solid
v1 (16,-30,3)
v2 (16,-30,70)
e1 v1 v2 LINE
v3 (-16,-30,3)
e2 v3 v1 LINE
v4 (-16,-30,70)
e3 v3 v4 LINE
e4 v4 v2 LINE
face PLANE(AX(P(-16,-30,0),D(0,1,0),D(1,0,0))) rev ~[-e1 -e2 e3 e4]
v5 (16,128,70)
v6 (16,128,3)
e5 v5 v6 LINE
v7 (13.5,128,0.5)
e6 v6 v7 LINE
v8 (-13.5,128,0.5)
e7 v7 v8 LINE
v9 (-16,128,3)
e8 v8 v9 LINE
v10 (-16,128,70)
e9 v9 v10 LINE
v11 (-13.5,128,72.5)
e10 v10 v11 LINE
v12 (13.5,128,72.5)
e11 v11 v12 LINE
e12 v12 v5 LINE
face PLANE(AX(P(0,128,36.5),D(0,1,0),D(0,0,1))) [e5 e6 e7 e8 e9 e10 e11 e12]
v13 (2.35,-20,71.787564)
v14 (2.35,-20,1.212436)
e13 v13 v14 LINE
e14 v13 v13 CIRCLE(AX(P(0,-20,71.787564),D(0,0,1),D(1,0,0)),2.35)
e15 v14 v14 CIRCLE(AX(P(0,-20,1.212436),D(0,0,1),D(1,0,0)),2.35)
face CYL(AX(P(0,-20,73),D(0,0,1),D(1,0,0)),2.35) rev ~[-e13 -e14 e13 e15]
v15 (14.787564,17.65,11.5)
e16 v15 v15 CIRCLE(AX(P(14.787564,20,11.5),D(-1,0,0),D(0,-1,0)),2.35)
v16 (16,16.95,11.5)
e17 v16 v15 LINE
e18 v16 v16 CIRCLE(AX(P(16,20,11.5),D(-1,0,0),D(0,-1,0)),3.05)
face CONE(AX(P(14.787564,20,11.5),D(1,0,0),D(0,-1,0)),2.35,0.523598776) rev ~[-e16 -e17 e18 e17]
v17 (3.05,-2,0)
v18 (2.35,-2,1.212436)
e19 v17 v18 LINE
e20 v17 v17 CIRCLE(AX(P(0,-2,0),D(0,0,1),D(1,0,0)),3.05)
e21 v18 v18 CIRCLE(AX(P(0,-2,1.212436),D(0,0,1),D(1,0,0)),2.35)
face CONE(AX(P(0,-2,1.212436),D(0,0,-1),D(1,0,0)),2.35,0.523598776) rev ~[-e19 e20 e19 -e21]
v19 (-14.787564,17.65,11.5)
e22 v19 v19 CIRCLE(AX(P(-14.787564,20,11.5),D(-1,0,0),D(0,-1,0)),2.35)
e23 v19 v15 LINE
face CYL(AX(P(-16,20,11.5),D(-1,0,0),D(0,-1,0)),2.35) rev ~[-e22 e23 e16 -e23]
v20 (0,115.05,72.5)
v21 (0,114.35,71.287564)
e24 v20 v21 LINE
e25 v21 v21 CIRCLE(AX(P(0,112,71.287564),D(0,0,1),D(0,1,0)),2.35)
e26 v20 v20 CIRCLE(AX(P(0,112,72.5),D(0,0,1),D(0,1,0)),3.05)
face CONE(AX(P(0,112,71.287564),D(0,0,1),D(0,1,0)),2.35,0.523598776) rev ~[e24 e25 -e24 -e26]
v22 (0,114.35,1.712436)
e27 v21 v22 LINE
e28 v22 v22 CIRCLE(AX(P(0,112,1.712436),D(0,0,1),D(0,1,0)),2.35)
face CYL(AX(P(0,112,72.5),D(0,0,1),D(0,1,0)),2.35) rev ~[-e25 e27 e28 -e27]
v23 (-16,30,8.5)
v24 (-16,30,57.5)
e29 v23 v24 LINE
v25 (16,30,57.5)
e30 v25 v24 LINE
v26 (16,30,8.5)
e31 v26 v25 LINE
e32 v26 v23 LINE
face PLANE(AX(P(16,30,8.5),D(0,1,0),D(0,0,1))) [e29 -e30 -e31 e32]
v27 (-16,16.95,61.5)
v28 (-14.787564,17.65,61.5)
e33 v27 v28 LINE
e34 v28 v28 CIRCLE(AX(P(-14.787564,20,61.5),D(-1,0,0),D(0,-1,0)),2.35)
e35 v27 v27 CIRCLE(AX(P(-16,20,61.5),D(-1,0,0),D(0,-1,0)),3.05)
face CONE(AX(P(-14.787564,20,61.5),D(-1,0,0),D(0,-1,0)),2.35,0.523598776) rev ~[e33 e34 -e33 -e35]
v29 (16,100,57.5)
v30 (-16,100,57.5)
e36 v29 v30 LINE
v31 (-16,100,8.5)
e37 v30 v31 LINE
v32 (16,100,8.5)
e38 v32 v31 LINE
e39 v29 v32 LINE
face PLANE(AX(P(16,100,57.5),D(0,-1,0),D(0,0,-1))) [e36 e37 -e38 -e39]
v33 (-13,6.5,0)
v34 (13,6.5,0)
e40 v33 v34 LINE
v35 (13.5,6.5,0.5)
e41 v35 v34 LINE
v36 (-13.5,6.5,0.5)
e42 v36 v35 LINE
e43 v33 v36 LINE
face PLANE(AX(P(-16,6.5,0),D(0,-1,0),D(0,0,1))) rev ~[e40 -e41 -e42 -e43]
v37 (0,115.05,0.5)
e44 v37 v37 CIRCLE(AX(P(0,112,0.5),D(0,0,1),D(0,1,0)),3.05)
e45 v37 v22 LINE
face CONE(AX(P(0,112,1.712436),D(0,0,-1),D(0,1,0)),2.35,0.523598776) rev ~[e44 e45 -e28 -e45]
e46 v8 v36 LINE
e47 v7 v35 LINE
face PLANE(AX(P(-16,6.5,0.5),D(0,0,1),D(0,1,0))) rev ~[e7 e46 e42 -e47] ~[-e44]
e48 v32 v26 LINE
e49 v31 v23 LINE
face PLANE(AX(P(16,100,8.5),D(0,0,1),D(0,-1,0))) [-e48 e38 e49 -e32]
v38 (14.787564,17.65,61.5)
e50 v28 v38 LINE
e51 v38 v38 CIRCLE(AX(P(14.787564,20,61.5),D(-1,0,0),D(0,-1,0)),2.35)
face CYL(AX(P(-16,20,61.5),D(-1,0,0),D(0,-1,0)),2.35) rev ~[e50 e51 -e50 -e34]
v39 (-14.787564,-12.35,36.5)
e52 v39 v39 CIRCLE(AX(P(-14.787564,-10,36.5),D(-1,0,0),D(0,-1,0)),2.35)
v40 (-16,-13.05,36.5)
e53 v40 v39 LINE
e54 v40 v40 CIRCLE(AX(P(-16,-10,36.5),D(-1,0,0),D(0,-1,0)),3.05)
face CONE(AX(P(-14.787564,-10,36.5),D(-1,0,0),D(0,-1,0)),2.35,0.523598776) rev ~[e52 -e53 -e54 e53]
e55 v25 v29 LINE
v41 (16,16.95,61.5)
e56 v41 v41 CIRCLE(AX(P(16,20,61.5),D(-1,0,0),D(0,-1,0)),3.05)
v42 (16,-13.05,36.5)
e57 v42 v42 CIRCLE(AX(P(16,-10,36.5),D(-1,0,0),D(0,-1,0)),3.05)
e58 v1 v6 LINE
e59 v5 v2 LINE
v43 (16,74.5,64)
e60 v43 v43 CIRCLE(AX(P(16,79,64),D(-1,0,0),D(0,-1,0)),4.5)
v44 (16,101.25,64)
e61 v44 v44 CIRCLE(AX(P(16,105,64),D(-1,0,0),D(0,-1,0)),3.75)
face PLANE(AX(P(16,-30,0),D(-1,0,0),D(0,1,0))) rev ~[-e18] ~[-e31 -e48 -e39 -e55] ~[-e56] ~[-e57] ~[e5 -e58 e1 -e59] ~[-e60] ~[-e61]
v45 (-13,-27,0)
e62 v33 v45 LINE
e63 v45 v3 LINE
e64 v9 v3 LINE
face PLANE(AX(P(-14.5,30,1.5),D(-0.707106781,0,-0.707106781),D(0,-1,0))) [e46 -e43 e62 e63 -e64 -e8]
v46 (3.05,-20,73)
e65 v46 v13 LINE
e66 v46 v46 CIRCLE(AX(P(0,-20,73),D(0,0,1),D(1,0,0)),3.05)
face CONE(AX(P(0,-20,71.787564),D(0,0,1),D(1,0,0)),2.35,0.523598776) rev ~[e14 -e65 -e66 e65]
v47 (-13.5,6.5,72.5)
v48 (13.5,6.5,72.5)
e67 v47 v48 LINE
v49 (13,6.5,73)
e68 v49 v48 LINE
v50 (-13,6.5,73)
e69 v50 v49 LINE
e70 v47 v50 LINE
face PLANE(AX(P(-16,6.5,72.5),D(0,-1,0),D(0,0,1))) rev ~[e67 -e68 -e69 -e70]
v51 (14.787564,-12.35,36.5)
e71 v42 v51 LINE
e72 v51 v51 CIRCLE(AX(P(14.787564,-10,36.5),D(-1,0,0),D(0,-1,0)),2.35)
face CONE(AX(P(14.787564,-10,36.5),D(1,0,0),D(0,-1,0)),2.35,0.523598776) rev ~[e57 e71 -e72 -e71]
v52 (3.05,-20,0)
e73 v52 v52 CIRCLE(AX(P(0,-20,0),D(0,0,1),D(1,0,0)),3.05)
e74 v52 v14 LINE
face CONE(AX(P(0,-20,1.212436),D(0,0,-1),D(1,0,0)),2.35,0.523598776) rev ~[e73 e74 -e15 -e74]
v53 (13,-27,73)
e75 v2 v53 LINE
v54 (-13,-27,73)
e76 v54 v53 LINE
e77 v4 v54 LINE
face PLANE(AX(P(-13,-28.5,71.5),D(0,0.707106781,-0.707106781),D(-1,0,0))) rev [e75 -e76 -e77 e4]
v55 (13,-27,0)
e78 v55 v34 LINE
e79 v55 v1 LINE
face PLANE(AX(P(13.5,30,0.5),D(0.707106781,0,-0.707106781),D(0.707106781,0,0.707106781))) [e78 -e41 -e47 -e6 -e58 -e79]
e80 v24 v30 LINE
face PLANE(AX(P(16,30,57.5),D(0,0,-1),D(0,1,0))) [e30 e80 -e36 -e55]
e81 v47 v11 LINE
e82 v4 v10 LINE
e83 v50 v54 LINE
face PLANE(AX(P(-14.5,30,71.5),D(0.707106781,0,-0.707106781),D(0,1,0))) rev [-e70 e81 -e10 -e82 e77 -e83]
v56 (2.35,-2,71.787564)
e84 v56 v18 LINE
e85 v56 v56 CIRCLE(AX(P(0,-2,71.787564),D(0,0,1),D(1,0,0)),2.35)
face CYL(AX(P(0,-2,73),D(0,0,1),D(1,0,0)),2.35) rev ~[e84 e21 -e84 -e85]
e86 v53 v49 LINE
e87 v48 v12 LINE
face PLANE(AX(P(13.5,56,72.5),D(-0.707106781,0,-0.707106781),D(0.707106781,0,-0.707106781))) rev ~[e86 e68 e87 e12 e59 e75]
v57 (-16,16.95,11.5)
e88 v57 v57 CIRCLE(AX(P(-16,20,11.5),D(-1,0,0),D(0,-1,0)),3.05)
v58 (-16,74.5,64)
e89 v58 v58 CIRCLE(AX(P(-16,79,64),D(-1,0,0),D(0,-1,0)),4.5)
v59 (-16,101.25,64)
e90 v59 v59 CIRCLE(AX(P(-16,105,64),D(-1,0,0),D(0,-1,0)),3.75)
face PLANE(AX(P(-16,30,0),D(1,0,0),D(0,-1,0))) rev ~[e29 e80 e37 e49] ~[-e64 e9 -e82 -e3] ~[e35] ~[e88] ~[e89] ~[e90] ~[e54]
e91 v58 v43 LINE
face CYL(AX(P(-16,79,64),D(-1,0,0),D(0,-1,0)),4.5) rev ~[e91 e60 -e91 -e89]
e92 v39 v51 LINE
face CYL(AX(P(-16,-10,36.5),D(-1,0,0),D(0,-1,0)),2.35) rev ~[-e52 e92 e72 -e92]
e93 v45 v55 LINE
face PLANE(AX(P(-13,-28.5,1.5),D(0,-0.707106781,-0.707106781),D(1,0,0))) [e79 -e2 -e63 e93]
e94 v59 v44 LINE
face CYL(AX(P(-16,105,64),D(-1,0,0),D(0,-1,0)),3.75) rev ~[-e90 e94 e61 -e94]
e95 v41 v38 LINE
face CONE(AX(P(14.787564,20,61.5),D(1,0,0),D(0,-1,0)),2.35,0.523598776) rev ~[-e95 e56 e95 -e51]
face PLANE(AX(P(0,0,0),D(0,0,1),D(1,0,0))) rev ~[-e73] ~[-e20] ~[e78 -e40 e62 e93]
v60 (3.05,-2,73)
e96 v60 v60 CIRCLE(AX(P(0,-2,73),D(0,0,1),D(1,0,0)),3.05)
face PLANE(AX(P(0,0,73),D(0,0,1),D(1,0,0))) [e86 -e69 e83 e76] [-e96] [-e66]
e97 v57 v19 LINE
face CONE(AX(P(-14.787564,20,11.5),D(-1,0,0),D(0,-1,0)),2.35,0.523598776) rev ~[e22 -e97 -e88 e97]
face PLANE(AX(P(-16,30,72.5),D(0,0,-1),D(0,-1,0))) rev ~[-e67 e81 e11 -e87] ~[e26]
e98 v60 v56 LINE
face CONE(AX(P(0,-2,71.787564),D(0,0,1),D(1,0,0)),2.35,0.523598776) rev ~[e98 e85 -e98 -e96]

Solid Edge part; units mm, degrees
sketch "Sketch1" plane through (0, 0, 0) normal (0, 0, 1) x (1, 0, 0)
  line L0 (-16, -30) -> (16, -30)
  line L1 (16, -30) -> (16, 30)
  line L2 (16, 30) -> (-16, 30)
  line L3 (-16, 30) -> (-16, -30)
  dimension "D1" = 32
  dimension "D2" = 60
extrude "Protrusion1" add sketch "Sketch1" along normal blind 73
sketch "Sketch2" plane through (0, 0, 73) normal (0, 0, 1) x (1, 0, 0)
  circle A0 centre (0, -20) radius 2.35
  circle A1 centre (0, -2) radius 2.35
  dimension "D1" = 4.7
  dimension "D2" = 18
  dimension "D3" = 10
extrude "Cutout1" cut sketch "Sketch2" against normal through all
chamfer "Fase_3" distance 0.7 angle 60 4 edges at (-2.35, -2, 73) (-2.35, -20, 73) (-2.35, -20, 0) (-2.35, -2, 0) measured on face at (-10.9867, -19.4, 73) measured on face at (-10.9867, -19.4, 0)
chamfer "Fase_6" distance 3 angle 45 4 edges at (-16, 0, 73) (-16, 0, 0) (16, 0, 73) (16, 0, 0)
chamfer "Fase_7" distance 3 angle 45 2 edges at (0, -30, 73) (0, -30, 0)
sketch "Sketch3" plane through (-16, 0, 36.5) normal (-1, 0, 0) x (0, -1, 0)
  circle A0 centre (-20, 25) radius 2.35
  circle A1 centre (-20, -25) radius 2.35
  circle A2 centre (10, 0) radius 2.35
  dimension "D1" = 4.7
  dimension "D2" = 50
  dimension "D3" = 10
  dimension "D4" = 30
extrude "Cutout2" cut sketch "Sketch3" against normal through all
chamfer "Fase_9" distance 0.7 angle 60 6 edges at (-16, 22.35, 61.5) (-16, -7.65, 36.5) (-16, 22.35, 11.5) (16, 20, 59.15) (16, 20, 9.15) (16, -10, 34.15) measured on face at (-16, 20.6, 58.1633) measured on face at (16, -20.6, 58.1633)
sketch "Sketch4" plane through (-16, 0, 36.5) normal (-1, 0, 0) x (0, -1, 0)
  line L0 (-6.5, 36.5) -> (-30, 36.5)
  line L1 (-30, 36.5) -> (-30, 36)
  line L2 (-30, 36) -> (-6.5, 36)
  line L3 (-6.5, 36) -> (-6.5, 36.5)
  line L4 (-30, -36.5) -> (-6.5, -36.5)
  line L5 (-6.5, -36.5) -> (-6.5, -36)
  line L6 (-6.5, -36) -> (-30, -36)
  line L7 (-30, -36) -> (-30, -36.5)
  dimension "D1" = 0.5
  dimension "D2" = 36.5
  dimension "D3" = 0.5
  dimension "D4" = 36.5
extrude "Cutout3" cut sketch "Sketch4" against normal through all
sketch "Sketch5" plane through (0, 30, 36.5) normal (0, 1, 0) x (1, 0, 0)
  line L0 (-16, 33.5) -> (-13.5, 36)
  line L1 (-13.5, 36) -> (13.5, 36)
  line L2 (13.5, 36) -> (16, 33.5)
  line L3 (16, 33.5) -> (16, -33.5)
  line L4 (16, -33.5) -> (13.5, -36)
  line L5 (13.5, -36) -> (-13.5, -36)
  line L6 (-13.5, -36) -> (-16, -33.5)
  line L7 (-16, -33.5) -> (-16, 33.5)
extrude "Extrusionsausprägung_2" add sketch "Sketch5" along normal blind 26
sketch "Sketch6" plane through (0, 56, 36.5) normal (0, 1, 0) x (-1, 0, 0)
  line L0 (-13.5, 36) -> (-16, 33.5)
  line L1 (-16, 33.5) -> (-16, -33.5)
  line L2 (-16, -33.5) -> (-13.5, -36)
  line L3 (-13.5, -36) -> (13.5, -36)
  line L4 (13.5, -36) -> (16, -33.5)
  line L5 (16, -33.5) -> (16, 33.5)
  line L6 (16, 33.5) -> (13.5, 36)
  line L7 (13.5, 36) -> (-13.5, 36)
extrude "Extrusionsausprägung_3" add sketch "Sketch6" along normal blind 72
sketch "Sketch7" plane through (16, 47, 36.5) normal (1, 0, 0) x (0, 1, 0)
  line L0 (-17, 21) -> (53, 21)
  line L1 (53, 21) -> (53, -28)
  line L2 (53, -28) -> (-17, -28)
  line L3 (-17, -28) -> (-17, 21)
  dimension "D1" = 10
  dimension "D2" = 70
  dimension "D3" = 15
  dimension "D4" = 8
extrude "Cutout4" cut sketch "Sketch7" against normal through all
sketch "Sketch8" plane through (0, 65.25, 72.5) normal (0, 0, 1) x (0, 1, 0)
  circle A0 centre (46.75, 0) radius 2.35
  dimension "D1" = 4.7
  dimension "D2" = 16
extrude "Cutout5" cut sketch "Sketch8" against normal through all
chamfer "Fase_11" distance 0.7 angle 60 2 edges at (-2.35, 112, 0.5) (0, 109.65, 72.5) measured on face at (8.73, 108.965, 72.5) measured on face at (8.73, 25.535, 0.5)
sketch "Sketch9" plane through (-16, 49, 36.5) normal (-1, 0, 0) x (0, -1, 0)
  circle A0 centre (-56, 27.5) radius 3.75
  dimension "D1" = 7
  dimension "D2" = 7.5
  dimension "D3" = 8.5
extrude "Cutout6" cut sketch "Sketch9" against normal through all
sketch "Sketch10" plane through (-16, 49, 36.5) normal (-1, 0, 0) x (0, -1, 0)
  circle A0 centre (-30, 27.5) radius 4.5
  dimension "D1" = 9
  dimension "D2" = 26
extrude "Cutout7" cut sketch "Sketch10" against normal through all
properties material "Nylon, allgemein"
